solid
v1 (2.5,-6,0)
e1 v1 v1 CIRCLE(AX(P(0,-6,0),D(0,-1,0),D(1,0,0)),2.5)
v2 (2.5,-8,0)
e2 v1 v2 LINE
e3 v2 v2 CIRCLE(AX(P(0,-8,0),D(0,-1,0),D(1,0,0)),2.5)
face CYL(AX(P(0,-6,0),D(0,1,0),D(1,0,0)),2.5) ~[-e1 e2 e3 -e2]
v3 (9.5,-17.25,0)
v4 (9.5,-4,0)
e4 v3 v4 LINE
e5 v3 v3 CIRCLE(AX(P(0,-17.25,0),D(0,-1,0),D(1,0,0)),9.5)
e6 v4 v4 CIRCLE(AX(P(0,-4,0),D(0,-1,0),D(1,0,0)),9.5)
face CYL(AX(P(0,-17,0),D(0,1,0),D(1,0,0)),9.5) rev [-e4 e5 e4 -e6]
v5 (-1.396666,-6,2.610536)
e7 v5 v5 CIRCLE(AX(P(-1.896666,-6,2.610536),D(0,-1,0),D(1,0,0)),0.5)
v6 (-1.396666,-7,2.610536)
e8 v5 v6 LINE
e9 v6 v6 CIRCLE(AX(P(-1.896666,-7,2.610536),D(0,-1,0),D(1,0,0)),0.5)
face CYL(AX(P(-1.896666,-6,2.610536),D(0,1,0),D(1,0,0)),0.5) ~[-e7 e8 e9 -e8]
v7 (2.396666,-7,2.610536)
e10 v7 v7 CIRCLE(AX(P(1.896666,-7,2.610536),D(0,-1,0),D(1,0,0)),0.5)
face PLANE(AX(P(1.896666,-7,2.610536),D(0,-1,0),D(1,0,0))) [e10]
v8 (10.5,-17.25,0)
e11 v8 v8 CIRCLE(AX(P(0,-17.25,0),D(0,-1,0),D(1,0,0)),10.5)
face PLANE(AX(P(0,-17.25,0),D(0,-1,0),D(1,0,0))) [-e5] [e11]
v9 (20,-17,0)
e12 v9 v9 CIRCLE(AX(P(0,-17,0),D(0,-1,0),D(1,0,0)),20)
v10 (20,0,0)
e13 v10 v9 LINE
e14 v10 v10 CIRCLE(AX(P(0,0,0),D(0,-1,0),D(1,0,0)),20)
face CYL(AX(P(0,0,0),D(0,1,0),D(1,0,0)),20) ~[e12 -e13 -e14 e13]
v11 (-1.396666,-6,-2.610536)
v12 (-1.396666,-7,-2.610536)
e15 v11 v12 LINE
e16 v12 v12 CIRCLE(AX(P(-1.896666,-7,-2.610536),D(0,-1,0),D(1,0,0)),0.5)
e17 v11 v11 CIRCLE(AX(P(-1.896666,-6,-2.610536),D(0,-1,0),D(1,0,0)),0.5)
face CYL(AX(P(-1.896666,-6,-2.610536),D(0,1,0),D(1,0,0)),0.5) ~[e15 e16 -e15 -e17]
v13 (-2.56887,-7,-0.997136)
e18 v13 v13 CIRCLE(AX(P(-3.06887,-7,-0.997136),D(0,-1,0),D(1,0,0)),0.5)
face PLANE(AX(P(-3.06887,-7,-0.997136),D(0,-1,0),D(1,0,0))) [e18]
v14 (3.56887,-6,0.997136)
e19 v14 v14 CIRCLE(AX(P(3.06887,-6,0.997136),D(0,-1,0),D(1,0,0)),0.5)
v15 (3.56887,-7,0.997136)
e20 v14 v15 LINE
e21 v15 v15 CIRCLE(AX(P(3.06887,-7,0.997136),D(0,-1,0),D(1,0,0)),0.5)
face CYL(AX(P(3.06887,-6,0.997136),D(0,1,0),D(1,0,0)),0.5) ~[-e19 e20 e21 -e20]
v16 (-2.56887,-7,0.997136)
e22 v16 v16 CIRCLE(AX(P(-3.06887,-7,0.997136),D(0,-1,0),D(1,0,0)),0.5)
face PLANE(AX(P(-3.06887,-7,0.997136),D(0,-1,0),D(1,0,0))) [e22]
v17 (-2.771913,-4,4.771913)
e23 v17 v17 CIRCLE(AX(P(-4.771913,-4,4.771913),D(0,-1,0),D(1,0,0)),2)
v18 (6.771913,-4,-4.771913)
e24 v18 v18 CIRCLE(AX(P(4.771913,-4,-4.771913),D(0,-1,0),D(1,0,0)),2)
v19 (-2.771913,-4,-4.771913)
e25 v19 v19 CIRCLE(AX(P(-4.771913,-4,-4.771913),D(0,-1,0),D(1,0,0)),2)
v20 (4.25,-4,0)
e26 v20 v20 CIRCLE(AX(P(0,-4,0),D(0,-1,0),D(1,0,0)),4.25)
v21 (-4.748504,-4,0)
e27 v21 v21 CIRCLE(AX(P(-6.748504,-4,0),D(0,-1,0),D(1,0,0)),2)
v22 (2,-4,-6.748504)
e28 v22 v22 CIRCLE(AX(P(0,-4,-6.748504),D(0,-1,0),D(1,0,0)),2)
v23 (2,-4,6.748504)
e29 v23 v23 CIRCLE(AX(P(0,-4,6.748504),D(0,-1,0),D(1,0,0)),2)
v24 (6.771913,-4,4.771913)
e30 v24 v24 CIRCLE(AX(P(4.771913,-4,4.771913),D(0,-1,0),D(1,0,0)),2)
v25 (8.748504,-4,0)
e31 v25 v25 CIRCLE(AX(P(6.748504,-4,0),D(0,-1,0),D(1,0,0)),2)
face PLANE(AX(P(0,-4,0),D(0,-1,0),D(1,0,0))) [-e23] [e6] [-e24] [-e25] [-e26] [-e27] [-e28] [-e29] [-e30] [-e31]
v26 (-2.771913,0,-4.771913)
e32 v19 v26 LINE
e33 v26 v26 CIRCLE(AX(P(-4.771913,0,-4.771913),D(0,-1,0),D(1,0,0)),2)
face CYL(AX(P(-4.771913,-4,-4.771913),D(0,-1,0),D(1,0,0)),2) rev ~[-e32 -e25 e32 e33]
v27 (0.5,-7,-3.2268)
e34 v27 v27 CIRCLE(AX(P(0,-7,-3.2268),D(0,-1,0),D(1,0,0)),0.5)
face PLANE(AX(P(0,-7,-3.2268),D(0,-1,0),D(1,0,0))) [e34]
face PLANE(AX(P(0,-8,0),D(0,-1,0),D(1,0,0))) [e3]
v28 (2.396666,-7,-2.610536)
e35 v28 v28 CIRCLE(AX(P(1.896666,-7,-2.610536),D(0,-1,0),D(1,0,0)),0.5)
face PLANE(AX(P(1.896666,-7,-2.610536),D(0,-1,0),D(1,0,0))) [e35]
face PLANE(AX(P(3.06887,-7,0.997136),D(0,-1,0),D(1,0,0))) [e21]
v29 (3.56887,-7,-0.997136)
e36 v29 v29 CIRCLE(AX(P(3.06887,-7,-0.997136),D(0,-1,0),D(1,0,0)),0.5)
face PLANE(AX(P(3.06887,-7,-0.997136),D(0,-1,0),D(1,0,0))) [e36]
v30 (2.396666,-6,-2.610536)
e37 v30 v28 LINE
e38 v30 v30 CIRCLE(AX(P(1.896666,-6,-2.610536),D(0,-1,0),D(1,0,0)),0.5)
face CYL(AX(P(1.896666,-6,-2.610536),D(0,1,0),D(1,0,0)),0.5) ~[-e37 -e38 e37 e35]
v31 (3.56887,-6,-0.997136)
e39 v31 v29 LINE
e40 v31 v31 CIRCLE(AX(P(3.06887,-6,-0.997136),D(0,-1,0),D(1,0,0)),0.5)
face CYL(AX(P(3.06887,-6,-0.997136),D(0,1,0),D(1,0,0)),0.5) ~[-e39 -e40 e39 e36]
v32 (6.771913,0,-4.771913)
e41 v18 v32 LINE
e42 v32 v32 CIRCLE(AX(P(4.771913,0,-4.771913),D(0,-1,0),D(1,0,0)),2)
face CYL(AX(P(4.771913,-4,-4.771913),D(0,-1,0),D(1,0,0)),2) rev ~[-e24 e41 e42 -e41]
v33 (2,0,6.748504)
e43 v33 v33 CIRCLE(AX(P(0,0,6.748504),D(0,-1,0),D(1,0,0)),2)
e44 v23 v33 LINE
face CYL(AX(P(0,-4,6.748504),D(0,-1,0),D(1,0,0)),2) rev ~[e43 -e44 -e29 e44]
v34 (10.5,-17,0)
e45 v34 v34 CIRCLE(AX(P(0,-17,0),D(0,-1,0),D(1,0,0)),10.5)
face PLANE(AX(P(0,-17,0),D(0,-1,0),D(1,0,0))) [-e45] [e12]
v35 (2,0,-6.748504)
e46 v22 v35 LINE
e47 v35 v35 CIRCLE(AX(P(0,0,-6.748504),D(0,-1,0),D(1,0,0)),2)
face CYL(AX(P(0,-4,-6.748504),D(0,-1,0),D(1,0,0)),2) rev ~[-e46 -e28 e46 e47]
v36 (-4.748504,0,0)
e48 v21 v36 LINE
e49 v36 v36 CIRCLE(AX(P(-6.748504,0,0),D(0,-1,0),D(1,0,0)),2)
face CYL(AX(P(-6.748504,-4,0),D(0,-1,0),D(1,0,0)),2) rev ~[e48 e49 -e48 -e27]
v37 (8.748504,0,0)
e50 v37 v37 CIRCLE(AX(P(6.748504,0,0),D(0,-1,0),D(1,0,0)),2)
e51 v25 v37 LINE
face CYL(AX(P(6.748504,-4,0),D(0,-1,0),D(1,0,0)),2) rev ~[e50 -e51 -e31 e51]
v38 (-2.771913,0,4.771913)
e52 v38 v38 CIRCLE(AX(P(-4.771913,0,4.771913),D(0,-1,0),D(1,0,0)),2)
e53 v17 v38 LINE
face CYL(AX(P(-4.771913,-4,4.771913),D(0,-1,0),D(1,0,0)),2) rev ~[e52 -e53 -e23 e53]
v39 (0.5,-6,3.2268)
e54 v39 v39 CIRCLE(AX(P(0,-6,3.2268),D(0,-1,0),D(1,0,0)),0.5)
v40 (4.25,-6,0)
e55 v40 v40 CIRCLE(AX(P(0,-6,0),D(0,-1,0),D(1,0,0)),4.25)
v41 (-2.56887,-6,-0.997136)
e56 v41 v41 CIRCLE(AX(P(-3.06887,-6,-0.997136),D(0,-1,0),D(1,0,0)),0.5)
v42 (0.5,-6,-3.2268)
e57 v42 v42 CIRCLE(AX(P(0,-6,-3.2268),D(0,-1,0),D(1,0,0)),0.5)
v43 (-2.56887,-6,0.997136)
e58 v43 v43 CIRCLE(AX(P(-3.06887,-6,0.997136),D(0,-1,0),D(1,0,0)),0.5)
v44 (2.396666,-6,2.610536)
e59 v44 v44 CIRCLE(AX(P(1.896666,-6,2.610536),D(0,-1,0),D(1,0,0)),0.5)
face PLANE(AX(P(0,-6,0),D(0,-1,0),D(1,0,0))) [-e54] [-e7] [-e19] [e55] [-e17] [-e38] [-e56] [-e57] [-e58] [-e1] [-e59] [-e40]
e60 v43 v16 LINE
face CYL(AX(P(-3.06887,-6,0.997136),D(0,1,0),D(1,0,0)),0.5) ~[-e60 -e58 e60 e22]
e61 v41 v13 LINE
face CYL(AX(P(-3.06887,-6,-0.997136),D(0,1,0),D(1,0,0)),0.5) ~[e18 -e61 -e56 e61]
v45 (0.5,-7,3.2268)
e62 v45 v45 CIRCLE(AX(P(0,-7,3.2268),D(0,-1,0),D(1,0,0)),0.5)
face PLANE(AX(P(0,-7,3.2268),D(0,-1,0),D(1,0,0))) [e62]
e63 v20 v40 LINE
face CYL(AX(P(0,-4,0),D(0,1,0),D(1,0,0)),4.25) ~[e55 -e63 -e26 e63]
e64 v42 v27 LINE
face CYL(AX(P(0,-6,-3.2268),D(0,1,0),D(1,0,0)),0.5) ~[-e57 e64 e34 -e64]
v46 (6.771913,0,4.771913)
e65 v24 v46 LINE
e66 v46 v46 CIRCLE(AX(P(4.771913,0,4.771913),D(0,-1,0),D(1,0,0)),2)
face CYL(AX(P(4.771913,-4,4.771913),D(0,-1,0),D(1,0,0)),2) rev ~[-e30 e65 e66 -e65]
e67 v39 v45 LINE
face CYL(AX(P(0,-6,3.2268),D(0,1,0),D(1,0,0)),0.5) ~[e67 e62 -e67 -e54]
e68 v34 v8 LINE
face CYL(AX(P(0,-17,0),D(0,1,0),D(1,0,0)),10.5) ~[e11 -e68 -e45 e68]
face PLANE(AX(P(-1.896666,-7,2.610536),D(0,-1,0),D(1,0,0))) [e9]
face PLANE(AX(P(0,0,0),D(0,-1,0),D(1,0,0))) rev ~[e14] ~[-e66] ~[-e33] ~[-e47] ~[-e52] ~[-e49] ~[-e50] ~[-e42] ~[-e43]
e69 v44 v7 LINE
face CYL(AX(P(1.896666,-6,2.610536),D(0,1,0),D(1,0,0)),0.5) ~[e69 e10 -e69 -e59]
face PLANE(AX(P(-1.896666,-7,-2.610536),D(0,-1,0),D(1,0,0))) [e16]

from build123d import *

# Parameters (mm, degrees)
F0_R      = 20
F1_DEPTH  = 17
F2_R      = 9.5
F3_DEPTH  = 13
F2_R_2    = 10.5
F4_DEPTH  = 0.25
F5_R      = 2
F6_DEPTH  = 25
F7_R      = 4.25
F8_DEPTH  = 2
F9_R      = 2.5
F10_DEPTH = 2
F11_R     = 0.5
F12_DEPTH = 1


# Not quite as in the source:
# - a feature names something its author has since deleted; it is built from what else it names


with BuildPart() as f1:
    # F0 (on Front) → F1 (new body)
    with BuildSketch(Plane.XZ):
        Circle(F0_R)
    extrude(amount=F1_DEPTH)

    # F2 (on face) → F3 (cut)
    with BuildSketch(Plane.XZ.offset(17)):
        Circle(F2_R)
    extrude(amount=-F3_DEPTH, mode=Mode.SUBTRACT)

    # F2 (on face) → F4 (join)
    with BuildSketch(Plane.XZ.offset(17)):
        Circle(F2_R_2)
        Circle(F2_R, mode=Mode.SUBTRACT)
    extrude(amount=F4_DEPTH)

    # F5 (on face) → F6 (cut)
    with BuildSketch(Plane.XZ.offset(4)):
        with Locations((0, 6.7485035397)):
            Circle(F5_R)
        with Locations((4.7719126158, 4.7719126158)):
            Circle(F5_R)
        with Locations((6.7485035397, 0)):
            Circle(F5_R)
        with Locations((4.7719126158, -4.7719126158)):
            Circle(F5_R)
        with Locations((0, -6.7485035397)):
            Circle(F5_R)
        with Locations((-4.7719126158, -4.7719126158)):
            Circle(F5_R)
        with Locations((-6.7485035397, 0)):
            Circle(F5_R)
        with Locations((-4.7719126158, 4.7719126158)):
            Circle(F5_R)
    extrude(amount=-F6_DEPTH, mode=Mode.SUBTRACT)

    # F7 (on face) → F8 (join)
    with BuildSketch(Plane.XZ.offset(4)):
        Circle(F7_R)
    extrude(amount=F8_DEPTH)

    # F9 (on face) → F10 (join)
    with BuildSketch(Plane.XZ.offset(6)):
        Circle(F9_R)
    extrude(amount=F10_DEPTH)

    # F11 (on face) → F12 (join)
    with BuildSketch(Plane.XZ.offset(6)):
        with Locations((0, 3.2268003561)):
            Circle(F11_R)
        with Locations((1.8966656614, 2.6105363255)):
            Circle(F11_R)
        with Locations((3.0688695054, -0.9971361475)):
            Circle(F11_R)
        with Locations((3.0688695054, 0.9971361475)):
            Circle(F11_R)
        with Locations((1.8966656614, -2.6105363255)):
            Circle(F11_R)
        with Locations((0, -3.2268003561)):
            Circle(F11_R)
        with Locations((-1.8966656614, -2.6105363255)):
            Circle(F11_R)
        with Locations((-3.0688695054, -0.9971361475)):
            Circle(F11_R)
        with Locations((-3.0688695054, 0.9971361475)):
            Circle(F11_R)
        with Locations((-1.8966656614, 2.6105363255)):
            Circle(F11_R)
    extrude(amount=F12_DEPTH)


solid = f1.part
